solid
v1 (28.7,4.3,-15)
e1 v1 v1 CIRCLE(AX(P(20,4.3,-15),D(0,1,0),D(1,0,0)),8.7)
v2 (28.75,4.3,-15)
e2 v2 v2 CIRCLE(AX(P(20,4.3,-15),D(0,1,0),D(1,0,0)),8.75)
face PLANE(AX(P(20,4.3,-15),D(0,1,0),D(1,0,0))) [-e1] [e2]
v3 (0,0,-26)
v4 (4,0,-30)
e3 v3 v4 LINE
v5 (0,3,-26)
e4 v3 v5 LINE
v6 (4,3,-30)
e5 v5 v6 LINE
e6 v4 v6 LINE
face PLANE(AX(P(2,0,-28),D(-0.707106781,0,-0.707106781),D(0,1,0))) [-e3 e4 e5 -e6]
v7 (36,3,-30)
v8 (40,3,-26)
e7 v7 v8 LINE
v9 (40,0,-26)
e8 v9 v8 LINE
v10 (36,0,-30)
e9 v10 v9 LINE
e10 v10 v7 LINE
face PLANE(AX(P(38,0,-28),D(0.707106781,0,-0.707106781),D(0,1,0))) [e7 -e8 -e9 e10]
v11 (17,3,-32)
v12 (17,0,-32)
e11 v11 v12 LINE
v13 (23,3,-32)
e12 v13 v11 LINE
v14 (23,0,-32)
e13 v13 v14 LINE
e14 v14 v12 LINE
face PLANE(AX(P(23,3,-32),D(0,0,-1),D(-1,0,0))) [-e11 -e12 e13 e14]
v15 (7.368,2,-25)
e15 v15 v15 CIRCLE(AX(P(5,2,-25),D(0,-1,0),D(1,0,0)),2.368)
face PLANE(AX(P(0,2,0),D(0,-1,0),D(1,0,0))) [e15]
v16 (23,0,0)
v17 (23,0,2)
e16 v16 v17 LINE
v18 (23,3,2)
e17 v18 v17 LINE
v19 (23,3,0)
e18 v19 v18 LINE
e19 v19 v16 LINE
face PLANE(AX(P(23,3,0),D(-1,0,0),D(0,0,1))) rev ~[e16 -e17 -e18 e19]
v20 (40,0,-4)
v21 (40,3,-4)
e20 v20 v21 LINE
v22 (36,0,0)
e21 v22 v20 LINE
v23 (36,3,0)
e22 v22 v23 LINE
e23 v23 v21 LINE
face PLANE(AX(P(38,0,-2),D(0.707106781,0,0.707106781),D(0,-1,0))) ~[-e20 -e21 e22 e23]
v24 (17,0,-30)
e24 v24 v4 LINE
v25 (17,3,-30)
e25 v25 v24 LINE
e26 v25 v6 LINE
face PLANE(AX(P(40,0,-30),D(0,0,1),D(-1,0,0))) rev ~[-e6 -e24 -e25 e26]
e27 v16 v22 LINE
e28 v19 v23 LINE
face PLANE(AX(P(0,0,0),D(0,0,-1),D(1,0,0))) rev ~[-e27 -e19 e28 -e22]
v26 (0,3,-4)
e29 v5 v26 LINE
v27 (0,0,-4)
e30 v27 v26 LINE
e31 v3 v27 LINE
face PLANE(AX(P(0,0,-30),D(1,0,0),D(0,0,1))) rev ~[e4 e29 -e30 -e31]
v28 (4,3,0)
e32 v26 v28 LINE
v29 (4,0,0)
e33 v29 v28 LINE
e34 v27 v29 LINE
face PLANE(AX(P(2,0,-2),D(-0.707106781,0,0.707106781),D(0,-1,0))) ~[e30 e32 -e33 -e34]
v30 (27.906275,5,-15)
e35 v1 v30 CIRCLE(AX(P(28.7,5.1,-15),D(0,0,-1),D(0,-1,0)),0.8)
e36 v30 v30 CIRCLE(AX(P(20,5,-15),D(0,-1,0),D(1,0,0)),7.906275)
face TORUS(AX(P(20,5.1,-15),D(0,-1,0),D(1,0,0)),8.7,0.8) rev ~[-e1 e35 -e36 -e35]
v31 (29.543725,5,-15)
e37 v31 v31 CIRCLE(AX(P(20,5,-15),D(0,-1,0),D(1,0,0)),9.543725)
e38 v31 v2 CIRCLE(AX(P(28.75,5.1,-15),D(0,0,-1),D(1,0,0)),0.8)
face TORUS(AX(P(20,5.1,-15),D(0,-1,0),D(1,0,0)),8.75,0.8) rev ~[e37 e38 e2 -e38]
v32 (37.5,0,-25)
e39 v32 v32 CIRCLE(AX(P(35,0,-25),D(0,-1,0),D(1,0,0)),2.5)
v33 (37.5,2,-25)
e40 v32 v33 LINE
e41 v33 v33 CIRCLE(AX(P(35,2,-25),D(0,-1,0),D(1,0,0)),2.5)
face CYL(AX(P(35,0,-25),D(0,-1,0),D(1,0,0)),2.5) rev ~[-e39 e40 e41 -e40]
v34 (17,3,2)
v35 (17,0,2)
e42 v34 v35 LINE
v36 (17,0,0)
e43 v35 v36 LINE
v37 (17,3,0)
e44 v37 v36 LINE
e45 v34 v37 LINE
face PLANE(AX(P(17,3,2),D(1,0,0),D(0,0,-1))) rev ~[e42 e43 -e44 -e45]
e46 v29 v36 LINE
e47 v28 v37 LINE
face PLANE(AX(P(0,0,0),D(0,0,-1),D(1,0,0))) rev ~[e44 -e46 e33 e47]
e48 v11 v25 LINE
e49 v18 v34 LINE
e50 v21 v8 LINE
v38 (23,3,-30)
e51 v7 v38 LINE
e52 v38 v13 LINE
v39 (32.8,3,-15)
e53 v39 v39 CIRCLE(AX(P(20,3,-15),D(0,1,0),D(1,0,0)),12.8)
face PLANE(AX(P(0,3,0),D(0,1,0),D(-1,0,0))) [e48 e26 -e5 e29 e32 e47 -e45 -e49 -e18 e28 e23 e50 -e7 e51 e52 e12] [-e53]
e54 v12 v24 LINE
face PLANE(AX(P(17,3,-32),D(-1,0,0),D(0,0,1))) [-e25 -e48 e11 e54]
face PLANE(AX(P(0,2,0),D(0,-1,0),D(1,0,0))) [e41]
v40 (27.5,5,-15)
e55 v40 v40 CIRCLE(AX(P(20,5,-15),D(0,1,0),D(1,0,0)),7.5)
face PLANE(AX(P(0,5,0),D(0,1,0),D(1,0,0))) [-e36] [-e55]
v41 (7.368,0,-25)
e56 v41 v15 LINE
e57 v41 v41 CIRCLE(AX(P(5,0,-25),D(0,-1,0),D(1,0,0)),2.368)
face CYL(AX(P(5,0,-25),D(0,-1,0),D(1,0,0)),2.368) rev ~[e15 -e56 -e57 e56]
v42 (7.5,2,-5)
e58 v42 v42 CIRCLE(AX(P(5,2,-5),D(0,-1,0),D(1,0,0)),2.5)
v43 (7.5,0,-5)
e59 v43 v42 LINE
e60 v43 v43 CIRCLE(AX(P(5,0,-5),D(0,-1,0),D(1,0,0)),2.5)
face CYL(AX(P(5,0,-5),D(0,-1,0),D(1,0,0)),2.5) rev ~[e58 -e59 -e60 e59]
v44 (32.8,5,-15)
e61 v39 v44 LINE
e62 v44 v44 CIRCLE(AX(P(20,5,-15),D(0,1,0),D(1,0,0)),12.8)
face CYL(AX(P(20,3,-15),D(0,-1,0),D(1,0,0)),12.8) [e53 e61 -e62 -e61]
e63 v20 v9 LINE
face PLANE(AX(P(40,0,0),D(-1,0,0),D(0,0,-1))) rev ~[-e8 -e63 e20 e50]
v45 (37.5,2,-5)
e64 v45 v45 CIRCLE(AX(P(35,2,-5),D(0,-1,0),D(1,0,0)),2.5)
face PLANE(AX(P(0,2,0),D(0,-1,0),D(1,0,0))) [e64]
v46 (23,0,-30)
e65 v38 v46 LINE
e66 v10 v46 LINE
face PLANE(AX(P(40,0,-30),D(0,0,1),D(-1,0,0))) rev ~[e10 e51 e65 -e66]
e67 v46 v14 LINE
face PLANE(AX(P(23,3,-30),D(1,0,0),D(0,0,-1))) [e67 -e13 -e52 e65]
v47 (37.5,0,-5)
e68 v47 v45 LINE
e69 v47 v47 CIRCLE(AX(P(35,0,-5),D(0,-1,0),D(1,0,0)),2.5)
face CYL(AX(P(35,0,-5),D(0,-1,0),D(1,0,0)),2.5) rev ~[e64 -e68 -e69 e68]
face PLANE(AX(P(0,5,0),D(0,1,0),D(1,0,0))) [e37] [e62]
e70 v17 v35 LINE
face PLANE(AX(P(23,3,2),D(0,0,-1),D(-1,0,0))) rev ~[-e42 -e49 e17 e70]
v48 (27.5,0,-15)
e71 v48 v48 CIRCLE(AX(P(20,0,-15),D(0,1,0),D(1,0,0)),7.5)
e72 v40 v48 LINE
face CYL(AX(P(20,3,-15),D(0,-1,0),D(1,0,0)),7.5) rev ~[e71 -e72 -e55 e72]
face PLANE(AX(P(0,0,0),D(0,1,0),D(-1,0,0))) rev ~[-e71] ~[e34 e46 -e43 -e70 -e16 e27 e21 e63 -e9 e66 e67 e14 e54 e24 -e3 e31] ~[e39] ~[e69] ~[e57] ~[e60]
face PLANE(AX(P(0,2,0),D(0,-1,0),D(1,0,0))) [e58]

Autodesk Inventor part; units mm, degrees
ref_plane "YZ Plane" through (0, 0, 0) normal (1, 0, 0) x (0, 1, 0)
ref_plane "XZ Plane" through (0, 0, 0) normal (0, 1, 0) x (-1, 0, 0)
ref_plane "XY Plane" through (0, 0, 0) normal (0, 0, 1) x (1, 0, 0)
sketch "Sketch1" plane through (0, 0, 0) normal (0, 1, 0) x (-1, 0, 0)
  line L0 (0, 0) -> (-40, 0)
  line L1 (-40, 0) -> (-40, -30)
  line L2 (-40, -30) -> (0, -30)
  line L3 (0, -30) -> (0, 0)
  dimension "d0" = 30
  dimension "d1" = 40
extrude "Extrusion1" add sketch "Sketch1" along normal blind 3
sketch "Sketch2" plane through (0, 3, 0) normal (0, 1, 0) x (1, 0, 0)
  circle A0 centre (20, 15) radius 7.5
  line L0 (0, 30) -> (0, 0) projected
  line L1 (0, 0) -> (40, 0) projected
  dimension "d4" = 15
  dimension "d5" = 20
  dimension "d6" = 15
extrude "Extrusion2" cut sketch "Sketch2" against normal blind 3
sketch "Sketch3" plane through (0, 3, 0) normal (0, 1, 0) x (1, 0, 0)
  circle A0 centre (20, 15) radius 7.5 projected
  circle A1 centre (20, 15) radius 7.5
  circle A2 centre (20, 15) radius 12.8
  point P0 (0, 0)
  dimension "d9" = 25.6
extrude "Extrusion3" add sketch "Sketch3" along normal blind 2
sketch "Sketch4" plane through (0, 0, 0) normal (0, -1, 0) x (1, 0, 0)
  circle A0 centre (5, -25) radius 2.368
  circle A1 centre (5, -5) radius 2.5
  circle A2 centre (35, -25) radius 2.5
  circle A3 centre (35, -5) radius 2.5
  circle A4 centre (20, -15) radius 7.5 projected
  point P0 (0, 0)
  dimension "d12" = 5
  dimension "d13" = 5
  dimension "d14" = 5
  dimension "d15" = 15
  dimension "d16" = 10
  dimension "d17" = 10
  dimension "d18" = 15
  dimension "d19" = 15
  dimension "d20" = 15
  dimension "d21" = 10
  dimension "d22" = 10
extrude "Extrusion4" cut sketch "Sketch4" against normal blind 2 contours A0 | A1 | A2 | A3
chamfer "Chamfer1" distance 4 angle 45 4 edges at (40, 1.5, 0) (40, 1.5, -30) (0, 1.5, 0) (0, 1.5, -30)
sketch "Sketch5" plane through (0, 3, 0) normal (0, 1, 0) x (1, 0, 0)
  line L0 (36, 30) -> (4, 30) projected
  line L1 (17, 30) -> (23, 30)
  line L2 (23, 30) -> (23, 32)
  line L3 (23, 32) -> (17, 32)
  line L4 (17, 32) -> (17, 30)
  line L5 (17, 0) -> (23, 0)
  line L6 (23, 0) -> (23, -2)
  line L7 (23, -2) -> (17, -2)
  line L8 (17, -2) -> (17, 0)
  line L9 (0, 26) -> (0, 4) projected
  line L10 (4, 0) -> (36, 0) projected
  point P0 (0, 0)
  dimension "d28" = 6
  dimension "d29" = 17
  dimension "d30" = 2
  dimension "d31" = 6
  dimension "d32" = 17
  dimension "d33" = 2
  dimension "d34" = 0
  dimension "d35" = 2
extrude "Extrusion5" add sketch "Sketch5" against normal blind 3
sketch "Sketch6" plane through (20, 5, -15) normal (0, 1, 0) x (1, 0, 0)
  circle A0 centre (0, 0) radius 9.55
  circle A1 centre (0, 0) radius 7.9
  point P0 (-20, -15)
  dimension "d38" = 15.8
  dimension "d39" = 19.1
extrude "Extrusion6" cut sketch "Sketch6" against normal blind 0.7
fillet "Fillet1" radius 0.8 2 edges at (12.1, 4.3, -15) (10.45, 4.3, -15)
properties part number "chamber_top"
